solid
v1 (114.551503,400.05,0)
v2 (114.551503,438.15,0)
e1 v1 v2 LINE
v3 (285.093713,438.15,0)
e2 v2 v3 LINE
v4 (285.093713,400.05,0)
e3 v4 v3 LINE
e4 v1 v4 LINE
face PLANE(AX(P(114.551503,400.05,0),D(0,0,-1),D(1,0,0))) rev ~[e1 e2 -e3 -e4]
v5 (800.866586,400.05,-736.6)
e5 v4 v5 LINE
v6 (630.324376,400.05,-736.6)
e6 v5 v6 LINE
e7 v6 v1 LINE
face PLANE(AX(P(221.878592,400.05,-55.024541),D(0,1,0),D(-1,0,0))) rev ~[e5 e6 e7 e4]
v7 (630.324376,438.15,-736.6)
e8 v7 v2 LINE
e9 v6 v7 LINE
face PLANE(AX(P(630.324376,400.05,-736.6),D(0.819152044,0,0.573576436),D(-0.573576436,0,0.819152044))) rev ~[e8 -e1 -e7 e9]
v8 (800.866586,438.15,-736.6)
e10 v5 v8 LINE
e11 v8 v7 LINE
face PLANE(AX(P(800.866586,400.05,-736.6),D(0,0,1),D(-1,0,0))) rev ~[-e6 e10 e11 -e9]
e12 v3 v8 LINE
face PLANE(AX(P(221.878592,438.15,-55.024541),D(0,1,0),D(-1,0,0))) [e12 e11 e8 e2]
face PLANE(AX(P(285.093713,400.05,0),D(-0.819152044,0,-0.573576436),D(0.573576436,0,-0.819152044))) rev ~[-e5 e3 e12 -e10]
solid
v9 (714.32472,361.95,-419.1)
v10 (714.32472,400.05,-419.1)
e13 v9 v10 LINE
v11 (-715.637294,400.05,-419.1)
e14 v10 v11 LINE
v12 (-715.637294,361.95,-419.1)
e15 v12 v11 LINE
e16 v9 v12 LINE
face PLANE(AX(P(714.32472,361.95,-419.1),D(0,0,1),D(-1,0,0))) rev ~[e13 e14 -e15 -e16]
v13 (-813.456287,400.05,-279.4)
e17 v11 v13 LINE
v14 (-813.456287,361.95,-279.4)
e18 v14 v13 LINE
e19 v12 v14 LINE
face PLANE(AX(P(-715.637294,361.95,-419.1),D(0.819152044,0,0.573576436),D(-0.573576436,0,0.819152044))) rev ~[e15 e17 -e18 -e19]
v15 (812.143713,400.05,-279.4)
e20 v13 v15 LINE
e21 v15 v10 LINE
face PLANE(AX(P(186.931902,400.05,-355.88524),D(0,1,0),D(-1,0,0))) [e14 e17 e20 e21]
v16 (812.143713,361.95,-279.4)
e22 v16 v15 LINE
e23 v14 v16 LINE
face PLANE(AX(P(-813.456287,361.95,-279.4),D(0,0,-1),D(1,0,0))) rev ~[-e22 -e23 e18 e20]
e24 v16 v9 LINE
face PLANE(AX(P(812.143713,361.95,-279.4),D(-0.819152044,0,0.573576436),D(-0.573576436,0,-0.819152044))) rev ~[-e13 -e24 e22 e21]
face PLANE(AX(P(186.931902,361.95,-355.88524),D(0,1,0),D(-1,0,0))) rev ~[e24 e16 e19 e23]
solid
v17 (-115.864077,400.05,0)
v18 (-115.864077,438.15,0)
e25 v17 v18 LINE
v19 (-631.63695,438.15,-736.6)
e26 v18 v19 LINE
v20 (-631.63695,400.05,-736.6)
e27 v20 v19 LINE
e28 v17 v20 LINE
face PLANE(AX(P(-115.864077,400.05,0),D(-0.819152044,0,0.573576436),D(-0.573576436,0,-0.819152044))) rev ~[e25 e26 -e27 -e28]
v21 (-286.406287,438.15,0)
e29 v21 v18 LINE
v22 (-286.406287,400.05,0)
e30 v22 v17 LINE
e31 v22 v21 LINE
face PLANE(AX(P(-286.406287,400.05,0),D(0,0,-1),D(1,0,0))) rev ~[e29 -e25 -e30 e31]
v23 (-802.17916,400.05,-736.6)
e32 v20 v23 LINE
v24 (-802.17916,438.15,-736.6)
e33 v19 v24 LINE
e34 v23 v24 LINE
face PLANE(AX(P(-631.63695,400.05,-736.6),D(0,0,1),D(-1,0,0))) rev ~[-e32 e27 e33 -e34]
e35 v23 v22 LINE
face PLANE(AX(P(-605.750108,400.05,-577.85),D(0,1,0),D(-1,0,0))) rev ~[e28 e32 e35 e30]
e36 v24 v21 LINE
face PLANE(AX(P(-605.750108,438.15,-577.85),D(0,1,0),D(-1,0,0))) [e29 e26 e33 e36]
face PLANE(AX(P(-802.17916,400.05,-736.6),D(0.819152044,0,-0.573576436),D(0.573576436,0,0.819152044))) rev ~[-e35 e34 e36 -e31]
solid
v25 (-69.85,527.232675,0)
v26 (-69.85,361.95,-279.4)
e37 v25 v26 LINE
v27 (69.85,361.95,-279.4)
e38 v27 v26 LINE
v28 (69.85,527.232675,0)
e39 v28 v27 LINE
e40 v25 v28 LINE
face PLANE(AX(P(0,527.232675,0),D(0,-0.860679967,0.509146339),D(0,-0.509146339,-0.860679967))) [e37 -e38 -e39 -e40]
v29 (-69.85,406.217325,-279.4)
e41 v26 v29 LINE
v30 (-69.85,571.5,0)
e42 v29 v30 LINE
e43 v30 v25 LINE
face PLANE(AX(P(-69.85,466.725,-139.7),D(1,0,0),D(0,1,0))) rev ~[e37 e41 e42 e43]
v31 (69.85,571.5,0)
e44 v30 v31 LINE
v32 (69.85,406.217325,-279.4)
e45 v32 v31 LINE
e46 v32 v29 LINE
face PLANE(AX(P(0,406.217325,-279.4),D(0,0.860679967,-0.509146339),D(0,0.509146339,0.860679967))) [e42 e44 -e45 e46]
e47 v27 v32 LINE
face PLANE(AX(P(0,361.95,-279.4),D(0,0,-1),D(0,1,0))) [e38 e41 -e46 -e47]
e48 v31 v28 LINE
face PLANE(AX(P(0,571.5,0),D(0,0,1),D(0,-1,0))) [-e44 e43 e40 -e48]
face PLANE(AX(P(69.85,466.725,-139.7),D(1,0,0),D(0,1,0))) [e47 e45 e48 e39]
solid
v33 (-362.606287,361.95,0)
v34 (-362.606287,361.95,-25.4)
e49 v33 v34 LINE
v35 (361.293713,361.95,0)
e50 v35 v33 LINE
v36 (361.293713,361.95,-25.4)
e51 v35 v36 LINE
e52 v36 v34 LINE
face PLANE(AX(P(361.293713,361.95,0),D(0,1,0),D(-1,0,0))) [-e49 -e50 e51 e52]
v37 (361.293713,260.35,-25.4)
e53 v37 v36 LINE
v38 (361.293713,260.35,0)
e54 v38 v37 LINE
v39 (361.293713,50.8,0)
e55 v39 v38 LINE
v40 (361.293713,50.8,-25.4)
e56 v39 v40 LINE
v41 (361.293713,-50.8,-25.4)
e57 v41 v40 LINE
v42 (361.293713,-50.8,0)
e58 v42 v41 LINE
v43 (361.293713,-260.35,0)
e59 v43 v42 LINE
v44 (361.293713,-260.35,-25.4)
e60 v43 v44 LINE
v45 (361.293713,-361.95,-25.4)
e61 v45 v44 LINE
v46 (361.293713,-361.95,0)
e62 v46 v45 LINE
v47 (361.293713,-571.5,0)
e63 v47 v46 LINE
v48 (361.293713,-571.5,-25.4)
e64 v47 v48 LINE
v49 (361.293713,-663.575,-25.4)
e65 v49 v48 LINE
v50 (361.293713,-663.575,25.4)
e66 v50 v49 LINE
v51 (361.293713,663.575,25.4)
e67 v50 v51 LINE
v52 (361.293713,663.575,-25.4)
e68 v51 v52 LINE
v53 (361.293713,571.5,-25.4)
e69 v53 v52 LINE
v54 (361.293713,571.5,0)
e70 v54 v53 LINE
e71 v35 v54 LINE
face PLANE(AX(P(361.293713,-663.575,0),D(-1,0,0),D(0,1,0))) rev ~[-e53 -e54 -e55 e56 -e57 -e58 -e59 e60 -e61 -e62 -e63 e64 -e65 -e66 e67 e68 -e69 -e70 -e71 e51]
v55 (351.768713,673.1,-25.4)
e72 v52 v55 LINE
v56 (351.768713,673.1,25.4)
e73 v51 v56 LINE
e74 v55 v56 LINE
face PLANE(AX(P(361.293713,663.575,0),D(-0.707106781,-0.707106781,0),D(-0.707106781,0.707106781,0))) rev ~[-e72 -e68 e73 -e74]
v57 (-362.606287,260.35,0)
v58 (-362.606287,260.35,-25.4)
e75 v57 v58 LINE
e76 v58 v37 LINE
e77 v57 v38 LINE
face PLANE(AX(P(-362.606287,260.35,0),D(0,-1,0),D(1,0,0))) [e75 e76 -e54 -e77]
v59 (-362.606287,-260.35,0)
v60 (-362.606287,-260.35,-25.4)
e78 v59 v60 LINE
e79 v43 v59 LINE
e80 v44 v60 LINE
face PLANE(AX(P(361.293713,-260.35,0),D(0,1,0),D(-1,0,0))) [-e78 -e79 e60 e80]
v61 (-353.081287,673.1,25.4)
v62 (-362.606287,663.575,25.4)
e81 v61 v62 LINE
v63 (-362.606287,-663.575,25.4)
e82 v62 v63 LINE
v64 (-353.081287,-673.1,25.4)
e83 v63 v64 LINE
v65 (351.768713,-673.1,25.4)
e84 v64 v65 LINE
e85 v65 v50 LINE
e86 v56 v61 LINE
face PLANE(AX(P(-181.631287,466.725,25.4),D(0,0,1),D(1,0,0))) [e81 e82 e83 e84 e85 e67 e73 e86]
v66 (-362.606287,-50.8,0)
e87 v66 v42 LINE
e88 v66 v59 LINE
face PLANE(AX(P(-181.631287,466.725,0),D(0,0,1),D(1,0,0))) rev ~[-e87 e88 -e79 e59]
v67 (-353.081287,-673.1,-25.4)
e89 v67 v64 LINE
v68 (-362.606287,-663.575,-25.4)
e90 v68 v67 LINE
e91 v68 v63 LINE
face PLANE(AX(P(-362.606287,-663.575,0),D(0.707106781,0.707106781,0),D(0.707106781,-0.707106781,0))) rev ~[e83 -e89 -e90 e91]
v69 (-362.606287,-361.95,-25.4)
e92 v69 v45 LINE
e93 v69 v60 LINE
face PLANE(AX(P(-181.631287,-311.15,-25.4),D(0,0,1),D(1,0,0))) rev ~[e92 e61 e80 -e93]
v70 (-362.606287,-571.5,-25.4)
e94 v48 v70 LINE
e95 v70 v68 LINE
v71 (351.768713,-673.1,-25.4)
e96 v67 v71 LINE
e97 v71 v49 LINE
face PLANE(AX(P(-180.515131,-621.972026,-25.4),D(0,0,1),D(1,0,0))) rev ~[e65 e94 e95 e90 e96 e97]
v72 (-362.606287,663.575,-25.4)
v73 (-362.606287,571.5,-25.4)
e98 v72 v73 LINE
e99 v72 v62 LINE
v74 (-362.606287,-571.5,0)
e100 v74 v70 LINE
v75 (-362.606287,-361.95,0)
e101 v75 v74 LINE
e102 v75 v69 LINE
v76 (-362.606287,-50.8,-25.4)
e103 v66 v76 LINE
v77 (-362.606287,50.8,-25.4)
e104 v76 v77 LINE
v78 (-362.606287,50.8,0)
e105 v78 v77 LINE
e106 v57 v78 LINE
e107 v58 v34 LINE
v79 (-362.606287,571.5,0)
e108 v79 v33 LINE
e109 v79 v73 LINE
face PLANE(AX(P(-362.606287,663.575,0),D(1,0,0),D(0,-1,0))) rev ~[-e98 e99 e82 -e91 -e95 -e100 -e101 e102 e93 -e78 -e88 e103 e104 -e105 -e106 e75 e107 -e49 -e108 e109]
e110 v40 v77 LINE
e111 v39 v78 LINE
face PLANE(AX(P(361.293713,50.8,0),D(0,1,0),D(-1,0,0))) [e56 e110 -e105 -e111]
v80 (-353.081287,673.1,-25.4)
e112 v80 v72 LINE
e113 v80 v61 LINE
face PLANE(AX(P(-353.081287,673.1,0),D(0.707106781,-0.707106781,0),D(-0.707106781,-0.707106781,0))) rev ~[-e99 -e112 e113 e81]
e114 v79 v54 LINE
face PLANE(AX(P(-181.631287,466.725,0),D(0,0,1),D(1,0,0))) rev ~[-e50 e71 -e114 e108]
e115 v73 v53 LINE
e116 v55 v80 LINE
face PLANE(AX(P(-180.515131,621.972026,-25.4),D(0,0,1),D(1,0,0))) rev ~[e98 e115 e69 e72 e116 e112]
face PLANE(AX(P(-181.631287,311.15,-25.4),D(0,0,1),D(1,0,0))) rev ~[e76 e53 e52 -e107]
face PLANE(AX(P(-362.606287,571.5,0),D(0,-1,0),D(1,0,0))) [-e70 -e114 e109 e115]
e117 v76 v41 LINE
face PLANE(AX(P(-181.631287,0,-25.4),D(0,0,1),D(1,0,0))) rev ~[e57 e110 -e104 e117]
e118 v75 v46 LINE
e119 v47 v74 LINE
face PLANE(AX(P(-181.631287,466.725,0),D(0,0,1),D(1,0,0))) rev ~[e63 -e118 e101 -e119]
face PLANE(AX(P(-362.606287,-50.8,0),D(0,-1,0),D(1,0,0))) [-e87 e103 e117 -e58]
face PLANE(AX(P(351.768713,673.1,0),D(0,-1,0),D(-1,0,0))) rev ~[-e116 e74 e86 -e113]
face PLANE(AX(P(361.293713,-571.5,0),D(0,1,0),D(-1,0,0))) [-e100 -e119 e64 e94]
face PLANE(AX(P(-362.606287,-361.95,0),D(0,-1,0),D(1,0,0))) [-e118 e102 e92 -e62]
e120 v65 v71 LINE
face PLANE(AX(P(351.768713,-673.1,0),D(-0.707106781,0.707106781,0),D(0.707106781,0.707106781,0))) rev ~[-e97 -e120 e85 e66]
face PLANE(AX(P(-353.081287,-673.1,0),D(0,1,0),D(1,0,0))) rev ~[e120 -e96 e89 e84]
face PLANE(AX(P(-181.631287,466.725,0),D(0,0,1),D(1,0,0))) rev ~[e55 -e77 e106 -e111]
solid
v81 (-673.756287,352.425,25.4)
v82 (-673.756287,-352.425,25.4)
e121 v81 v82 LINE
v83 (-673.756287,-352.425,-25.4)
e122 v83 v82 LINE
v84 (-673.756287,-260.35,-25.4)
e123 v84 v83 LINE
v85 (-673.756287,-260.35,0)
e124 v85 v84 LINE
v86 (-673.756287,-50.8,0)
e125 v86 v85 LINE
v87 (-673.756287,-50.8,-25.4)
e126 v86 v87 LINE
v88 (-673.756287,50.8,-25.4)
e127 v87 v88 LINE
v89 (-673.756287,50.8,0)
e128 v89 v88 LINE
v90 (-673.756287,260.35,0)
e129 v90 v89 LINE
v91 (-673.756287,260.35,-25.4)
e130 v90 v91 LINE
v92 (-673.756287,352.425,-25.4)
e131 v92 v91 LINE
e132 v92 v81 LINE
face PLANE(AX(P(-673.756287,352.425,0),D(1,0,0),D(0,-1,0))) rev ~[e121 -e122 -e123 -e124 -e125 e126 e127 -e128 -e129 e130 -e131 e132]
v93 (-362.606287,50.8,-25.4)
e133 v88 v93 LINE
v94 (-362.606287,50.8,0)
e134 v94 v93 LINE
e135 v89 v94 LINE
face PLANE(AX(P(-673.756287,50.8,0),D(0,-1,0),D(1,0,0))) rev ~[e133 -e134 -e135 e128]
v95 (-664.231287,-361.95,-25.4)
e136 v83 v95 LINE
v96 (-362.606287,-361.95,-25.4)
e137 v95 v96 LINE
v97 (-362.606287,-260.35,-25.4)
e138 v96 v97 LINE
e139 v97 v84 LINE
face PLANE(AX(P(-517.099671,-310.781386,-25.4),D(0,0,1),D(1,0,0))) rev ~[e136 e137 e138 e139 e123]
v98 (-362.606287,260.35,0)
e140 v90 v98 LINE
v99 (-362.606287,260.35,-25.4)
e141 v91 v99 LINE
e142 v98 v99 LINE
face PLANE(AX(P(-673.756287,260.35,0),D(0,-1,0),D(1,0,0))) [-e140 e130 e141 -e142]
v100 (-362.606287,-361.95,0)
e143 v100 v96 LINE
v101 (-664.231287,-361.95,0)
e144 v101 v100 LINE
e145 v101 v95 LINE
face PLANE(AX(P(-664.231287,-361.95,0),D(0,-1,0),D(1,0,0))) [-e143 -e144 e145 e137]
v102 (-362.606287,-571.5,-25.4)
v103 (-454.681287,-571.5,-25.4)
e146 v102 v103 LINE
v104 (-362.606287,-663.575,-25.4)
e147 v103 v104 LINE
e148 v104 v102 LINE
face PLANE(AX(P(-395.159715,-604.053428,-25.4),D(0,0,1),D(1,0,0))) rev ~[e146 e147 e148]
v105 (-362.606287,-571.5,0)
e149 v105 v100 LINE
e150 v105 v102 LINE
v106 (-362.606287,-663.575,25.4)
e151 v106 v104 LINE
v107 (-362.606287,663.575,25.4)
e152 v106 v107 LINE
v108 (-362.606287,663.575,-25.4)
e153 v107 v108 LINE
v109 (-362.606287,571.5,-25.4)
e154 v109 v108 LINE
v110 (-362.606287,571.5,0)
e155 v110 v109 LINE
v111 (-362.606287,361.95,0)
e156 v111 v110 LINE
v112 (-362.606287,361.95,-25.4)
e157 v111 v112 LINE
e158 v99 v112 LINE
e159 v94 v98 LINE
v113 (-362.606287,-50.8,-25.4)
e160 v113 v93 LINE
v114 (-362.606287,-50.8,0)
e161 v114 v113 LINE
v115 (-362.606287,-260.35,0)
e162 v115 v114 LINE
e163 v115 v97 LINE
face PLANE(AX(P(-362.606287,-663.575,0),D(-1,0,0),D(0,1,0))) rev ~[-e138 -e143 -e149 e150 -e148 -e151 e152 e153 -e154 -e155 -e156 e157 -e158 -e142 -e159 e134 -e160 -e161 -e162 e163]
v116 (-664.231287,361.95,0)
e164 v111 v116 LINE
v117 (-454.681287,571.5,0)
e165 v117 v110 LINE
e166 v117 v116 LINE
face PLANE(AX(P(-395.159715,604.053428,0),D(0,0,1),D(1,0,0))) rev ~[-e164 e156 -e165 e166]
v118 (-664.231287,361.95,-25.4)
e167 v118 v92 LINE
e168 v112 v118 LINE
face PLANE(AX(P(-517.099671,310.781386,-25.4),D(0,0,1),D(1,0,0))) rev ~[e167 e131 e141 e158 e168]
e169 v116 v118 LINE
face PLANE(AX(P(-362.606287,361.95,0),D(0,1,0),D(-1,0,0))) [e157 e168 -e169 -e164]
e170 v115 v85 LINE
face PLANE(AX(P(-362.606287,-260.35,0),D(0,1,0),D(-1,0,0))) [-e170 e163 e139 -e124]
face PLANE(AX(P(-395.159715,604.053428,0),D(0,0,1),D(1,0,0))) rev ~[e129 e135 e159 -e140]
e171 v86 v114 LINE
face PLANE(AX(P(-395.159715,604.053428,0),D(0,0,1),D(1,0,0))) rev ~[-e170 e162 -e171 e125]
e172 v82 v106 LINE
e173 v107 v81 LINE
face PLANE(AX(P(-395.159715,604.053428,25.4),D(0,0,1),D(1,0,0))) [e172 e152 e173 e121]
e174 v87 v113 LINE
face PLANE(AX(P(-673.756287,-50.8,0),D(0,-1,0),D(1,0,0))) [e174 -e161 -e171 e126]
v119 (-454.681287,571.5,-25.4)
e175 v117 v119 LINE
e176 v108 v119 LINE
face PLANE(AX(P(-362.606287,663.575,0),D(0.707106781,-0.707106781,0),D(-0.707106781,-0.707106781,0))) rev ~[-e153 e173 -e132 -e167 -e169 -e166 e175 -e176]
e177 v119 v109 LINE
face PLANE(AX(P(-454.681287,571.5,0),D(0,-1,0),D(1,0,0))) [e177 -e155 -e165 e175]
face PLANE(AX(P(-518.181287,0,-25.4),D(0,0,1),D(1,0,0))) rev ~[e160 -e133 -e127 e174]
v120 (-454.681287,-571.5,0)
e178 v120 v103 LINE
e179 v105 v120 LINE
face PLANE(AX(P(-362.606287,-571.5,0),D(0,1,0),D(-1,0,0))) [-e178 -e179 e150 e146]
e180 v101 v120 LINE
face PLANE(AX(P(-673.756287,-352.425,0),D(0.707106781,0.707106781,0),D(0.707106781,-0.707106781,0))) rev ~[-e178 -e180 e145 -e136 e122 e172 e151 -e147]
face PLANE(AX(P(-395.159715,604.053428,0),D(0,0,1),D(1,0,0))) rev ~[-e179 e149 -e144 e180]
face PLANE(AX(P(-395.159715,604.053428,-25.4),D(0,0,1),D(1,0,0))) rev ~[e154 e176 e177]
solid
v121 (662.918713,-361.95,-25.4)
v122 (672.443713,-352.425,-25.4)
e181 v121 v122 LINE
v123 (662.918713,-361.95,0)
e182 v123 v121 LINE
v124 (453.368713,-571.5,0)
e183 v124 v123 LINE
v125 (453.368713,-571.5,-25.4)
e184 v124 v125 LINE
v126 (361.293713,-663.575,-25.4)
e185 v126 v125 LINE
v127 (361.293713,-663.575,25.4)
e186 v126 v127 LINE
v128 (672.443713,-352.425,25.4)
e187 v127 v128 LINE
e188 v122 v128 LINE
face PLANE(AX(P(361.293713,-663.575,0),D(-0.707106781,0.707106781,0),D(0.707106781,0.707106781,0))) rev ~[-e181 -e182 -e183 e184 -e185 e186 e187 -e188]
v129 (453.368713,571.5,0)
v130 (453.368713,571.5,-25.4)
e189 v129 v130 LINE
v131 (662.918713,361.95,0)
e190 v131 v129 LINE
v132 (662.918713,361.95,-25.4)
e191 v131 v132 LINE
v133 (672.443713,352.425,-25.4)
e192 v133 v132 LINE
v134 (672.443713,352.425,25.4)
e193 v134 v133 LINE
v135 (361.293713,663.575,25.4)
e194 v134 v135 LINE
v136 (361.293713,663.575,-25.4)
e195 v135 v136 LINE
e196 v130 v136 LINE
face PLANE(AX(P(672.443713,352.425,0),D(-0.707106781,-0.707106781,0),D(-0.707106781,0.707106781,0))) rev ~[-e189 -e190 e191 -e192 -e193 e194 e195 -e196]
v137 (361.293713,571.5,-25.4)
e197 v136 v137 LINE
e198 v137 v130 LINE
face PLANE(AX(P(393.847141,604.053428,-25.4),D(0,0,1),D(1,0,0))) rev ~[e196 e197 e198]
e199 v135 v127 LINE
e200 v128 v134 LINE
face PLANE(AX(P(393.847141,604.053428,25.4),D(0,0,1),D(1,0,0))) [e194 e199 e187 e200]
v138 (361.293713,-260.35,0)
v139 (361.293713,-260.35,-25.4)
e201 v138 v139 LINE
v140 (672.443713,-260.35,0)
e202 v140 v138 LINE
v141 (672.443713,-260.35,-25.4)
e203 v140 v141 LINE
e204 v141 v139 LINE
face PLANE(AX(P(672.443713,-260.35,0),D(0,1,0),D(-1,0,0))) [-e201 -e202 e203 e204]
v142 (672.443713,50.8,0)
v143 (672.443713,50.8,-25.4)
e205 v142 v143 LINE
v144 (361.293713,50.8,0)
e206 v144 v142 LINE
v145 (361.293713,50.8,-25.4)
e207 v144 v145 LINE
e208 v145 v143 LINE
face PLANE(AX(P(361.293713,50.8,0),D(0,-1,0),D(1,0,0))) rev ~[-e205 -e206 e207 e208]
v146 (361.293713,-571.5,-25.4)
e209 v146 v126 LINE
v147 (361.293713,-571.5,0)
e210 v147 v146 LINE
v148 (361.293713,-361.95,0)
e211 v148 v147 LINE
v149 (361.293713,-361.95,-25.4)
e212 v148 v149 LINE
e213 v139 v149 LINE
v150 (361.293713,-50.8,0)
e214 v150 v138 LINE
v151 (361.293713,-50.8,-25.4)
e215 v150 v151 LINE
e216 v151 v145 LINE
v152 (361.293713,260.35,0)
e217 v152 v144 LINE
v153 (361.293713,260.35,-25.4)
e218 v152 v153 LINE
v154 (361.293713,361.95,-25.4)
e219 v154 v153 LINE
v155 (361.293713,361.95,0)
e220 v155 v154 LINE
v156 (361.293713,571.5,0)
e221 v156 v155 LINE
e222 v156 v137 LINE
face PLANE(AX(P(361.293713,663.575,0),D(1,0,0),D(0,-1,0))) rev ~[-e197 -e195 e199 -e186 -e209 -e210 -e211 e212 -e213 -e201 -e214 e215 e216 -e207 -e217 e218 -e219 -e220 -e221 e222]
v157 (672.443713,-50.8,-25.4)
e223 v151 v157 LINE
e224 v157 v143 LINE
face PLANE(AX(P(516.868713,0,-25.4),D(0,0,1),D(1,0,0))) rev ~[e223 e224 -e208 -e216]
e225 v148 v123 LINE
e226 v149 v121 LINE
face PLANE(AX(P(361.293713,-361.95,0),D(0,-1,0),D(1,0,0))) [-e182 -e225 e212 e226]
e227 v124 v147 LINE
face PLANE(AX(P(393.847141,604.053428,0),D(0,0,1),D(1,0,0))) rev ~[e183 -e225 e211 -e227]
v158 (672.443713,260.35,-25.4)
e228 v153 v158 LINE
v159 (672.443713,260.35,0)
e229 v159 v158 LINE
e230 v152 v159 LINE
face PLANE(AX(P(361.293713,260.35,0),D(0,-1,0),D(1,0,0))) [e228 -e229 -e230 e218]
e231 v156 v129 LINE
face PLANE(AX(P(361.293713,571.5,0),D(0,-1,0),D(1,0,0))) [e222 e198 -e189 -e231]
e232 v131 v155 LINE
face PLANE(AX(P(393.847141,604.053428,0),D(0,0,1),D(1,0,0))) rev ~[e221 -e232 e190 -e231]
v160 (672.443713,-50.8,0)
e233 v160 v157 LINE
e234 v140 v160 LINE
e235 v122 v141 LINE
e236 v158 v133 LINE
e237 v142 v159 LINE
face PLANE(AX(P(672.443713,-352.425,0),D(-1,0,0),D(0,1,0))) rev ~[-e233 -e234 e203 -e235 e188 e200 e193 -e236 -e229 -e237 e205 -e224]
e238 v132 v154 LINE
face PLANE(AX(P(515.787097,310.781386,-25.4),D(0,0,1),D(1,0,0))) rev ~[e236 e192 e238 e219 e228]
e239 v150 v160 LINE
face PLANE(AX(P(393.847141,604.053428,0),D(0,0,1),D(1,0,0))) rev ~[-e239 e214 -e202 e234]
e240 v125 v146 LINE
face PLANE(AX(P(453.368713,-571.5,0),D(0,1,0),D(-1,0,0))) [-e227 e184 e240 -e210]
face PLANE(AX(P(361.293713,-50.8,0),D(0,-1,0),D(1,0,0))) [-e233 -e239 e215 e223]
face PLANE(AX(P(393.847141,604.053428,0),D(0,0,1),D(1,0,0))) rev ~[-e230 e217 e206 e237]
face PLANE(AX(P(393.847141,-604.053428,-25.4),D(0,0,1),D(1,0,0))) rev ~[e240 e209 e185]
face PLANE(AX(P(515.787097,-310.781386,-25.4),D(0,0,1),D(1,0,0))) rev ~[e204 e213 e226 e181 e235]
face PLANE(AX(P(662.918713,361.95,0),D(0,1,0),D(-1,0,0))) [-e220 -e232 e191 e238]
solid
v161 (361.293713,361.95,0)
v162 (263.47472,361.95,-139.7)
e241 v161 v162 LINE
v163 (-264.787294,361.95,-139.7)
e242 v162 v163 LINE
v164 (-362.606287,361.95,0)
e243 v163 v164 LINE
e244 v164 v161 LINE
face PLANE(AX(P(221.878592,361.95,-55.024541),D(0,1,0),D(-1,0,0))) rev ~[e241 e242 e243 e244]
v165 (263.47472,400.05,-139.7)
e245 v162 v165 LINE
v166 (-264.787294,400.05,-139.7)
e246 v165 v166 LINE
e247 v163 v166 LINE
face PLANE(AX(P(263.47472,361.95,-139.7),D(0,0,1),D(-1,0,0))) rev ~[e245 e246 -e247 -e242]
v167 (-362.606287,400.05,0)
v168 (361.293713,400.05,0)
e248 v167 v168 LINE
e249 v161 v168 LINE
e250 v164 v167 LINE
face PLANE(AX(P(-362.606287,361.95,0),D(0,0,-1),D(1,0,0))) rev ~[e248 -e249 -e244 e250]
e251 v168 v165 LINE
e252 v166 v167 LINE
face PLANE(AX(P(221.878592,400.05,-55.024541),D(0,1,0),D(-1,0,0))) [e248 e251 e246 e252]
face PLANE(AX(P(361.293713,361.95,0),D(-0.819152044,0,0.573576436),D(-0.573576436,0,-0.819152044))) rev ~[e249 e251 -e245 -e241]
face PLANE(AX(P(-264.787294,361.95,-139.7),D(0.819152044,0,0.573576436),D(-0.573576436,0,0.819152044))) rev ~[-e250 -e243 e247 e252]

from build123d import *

# Parameters (mm, degrees)
F1_DEPTH  = 25.4
F0_W      = 311.15
F0_H      = 101.6
F0_H_2    = 209.55
F2_DEPTH  = 25.4
F3_DEPTH  = 25.4
F4_DEPTH  = 25.4
F5_DEPTH  = 25.4
F0_W_2    = 361.95
F6_DEPTH  = 25.4
F9_START  = 38.1
F9_DEPTH  = 38.1
F10_DEPTH = 38.1
F12_DEPTH = 69.85


with BuildPart() as f1:
    # F0 (on Top) → F1 (new body)
    with BuildSketch(Plane.XY):
        Polygon((-362.6062870026, 571.5), (-362.6062870026, 663.575), (-454.6812870026, 571.5), align=None)
    extrude(amount=-F1_DEPTH)



with BuildPart() as f1b:
    # F0 (on Top) → F1, piece 2 (new body)
    with BuildSketch(Plane.XY):
        Polygon((-362.6062870026, 260.35), (-362.6062870026, 361.95), (-664.2312870026, 361.95), (-673.7562870026, 352.425), (-673.7562870026, 260.35), align=None)
    extrude(amount=-F1_DEPTH)


with BuildPart() as f1c:
    # F0 (on Top) → F1, piece 3 (new body)
    with BuildSketch(Plane.XY):
        with Locations((-518.1812870026, 0)):
            Rectangle(F0_W, F0_H)
    extrude(amount=-F1_DEPTH)


with BuildPart() as f1d:
    # F0 (on Top) → F1, piece 4 (new body)
    with BuildSketch(Plane.XY):
        Polygon((-362.6062870026, -361.95), (-362.6062870026, -260.35), (-673.7562870026, -260.35), (-673.7562870026, -352.425), (-664.2312870026, -361.95), align=None)
    extrude(amount=-F1_DEPTH)


with BuildPart() as f1e:
    # F0 (on Top) → F1, piece 5 (new body)
    with BuildSketch(Plane.XY):
        Polygon((-362.6062870026, -663.575), (-362.6062870026, -571.5), (-454.6812870026, -571.5), align=None)
    extrude(amount=-F1_DEPTH)


with BuildPart() as f1_1:
    add(f1.part)

    add(f1b.part)  # F2 merges F1b

    add(f1c.part)  # F2 merges F1c

    add(f1d.part)  # F2 merges F1d

    add(f1e.part)  # F2 merges F1e
    # F0 (on Top) → F2 (join)
    with BuildSketch(Plane.XY):
        Polygon((-362.6062870026, 571.5), (-362.6062870026, 663.575), (-454.6812870026, 571.5), align=None)
        Polygon((-362.6062870026, 361.95), (-362.6062870026, 571.5), (-454.6812870026, 571.5), (-664.2312870026, 361.95), align=None)
        Polygon((-362.6062870026, 260.35), (-362.6062870026, 361.95), (-664.2312870026, 361.95), (-673.7562870026, 352.425), (-673.7562870026, 260.35), align=None)
        with Locations((-518.1812870026, 155.575)):
            Rectangle(F0_W, F0_H_2)
        with Locations((-518.1812870026, 0)):
            Rectangle(F0_W, F0_H)
        with Locations((-518.1812870026, -155.575)):
            Rectangle(F0_W, F0_H_2)
        Polygon((-362.6062870026, -361.95), (-362.6062870026, -260.35), (-673.7562870026, -260.35), (-673.7562870026, -352.425), (-664.2312870026, -361.95), align=None)
        Polygon((-362.6062870026, -571.5), (-362.6062870026, -361.95), (-664.2312870026, -361.95), (-454.6812870026, -571.5), align=None)
        Polygon((-362.6062870026, -663.575), (-362.6062870026, -571.5), (-454.6812870026, -571.5), align=None)
    extrude(amount=F2_DEPTH)


with BuildPart() as f3:
    # F0 (on Top) → F3 (new body)
    with BuildSketch(Plane.XY):
        Polygon((361.2937129974, 663.575), (361.2937129974, 571.5), (453.3687129974, 571.5), align=None)
    extrude(amount=-F3_DEPTH)



with BuildPart() as f3b:
    # F0 (on Top) → F3, piece 2 (new body)
    with BuildSketch(Plane.XY):
        Polygon((662.9187129974, 361.95), (361.2937129974, 361.95), (361.2937129974, 260.35), (672.4437129974, 260.35), (672.4437129974, 352.425), align=None)
    extrude(amount=-F3_DEPTH)


with BuildPart() as f3c:
    # F0 (on Top) → F3, piece 3 (new body)
    with BuildSketch(Plane.XY):
        with Locations((516.8687129974, 0)):
            Rectangle(F0_W, F0_H)
    extrude(amount=-F3_DEPTH)


with BuildPart() as f3d:
    # F0 (on Top) → F3, piece 4 (new body)
    with BuildSketch(Plane.XY):
        Polygon((672.4437129974, -260.35), (361.2937129974, -260.35), (361.2937129974, -361.95), (662.9187129974, -361.95), (672.4437129974, -352.425), align=None)
    extrude(amount=-F3_DEPTH)


with BuildPart() as f3e:
    # F0 (on Top) → F3, piece 5 (new body)
    with BuildSketch(Plane.XY):
        Polygon((453.3687129974, -571.5), (361.2937129974, -571.5), (361.2937129974, -663.575), align=None)
    extrude(amount=-F3_DEPTH)


with BuildPart() as f3_1:
    add(f3.part)

    add(f3b.part)  # F4 merges F3b

    add(f3c.part)  # F4 merges F3c

    add(f3d.part)  # F4 merges F3d

    add(f3e.part)  # F4 merges F3e
    # F0 (on Top) → F4 (join)
    with BuildSketch(Plane.XY):
        Polygon((361.2937129974, 663.575), (361.2937129974, 571.5), (453.3687129974, 571.5), align=None)
        Polygon((453.3687129974, 571.5), (361.2937129974, 571.5), (361.2937129974, 361.95), (662.9187129974, 361.95), align=None)
        Polygon((662.9187129974, 361.95), (361.2937129974, 361.95), (361.2937129974, 260.35), (672.4437129974, 260.35), (672.4437129974, 352.425), align=None)
        with Locations((516.8687129974, 155.575)):
            Rectangle(F0_W, F0_H_2)
        with Locations((516.8687129974, 0)):
            Rectangle(F0_W, F0_H)
        with Locations((516.8687129974, -155.575)):
            Rectangle(F0_W, F0_H_2)
        Polygon((672.4437129974, -260.35), (361.2937129974, -260.35), (361.2937129974, -361.95), (662.9187129974, -361.95), (672.4437129974, -352.425), align=None)
        Polygon((662.9187129974, -361.95), (361.2937129974, -361.95), (361.2937129974, -571.5), (453.3687129974, -571.5), align=None)
        Polygon((453.3687129974, -571.5), (361.2937129974, -571.5), (361.2937129974, -663.575), align=None)
    extrude(amount=F4_DEPTH)


with BuildPart() as f5:
    # F0 (on Top) → F5 (new body)
    with BuildSketch(Plane.XY):
        Polygon((-353.0812870026, 673.1), (-362.6062870026, 663.575), (-362.6062870026, 571.5), (-0.6562870026, 571.5), (-0.6562870026, 673.1), align=None)
        Polygon((-0.6562870026, 673.1), (-0.6562870026, 571.5), (361.2937129974, 571.5), (361.2937129974, 663.575), (351.7687129974, 673.1), align=None)
    extrude(amount=-F5_DEPTH)



with BuildPart() as f5b:
    # F0 (on Top) → F5, piece 2 (new body)
    with BuildSketch(Plane.XY):
        with Locations((-181.6312870026, 311.15)):
            Rectangle(F0_W_2, F0_H)
        with Locations((180.3187129974, 311.15)):
            Rectangle(F0_W_2, F0_H)
    extrude(amount=-F5_DEPTH)


with BuildPart() as f5c:
    # F0 (on Top) → F5, piece 3 (new body)
    with BuildSketch(Plane.XY):
        with Locations((-181.6312870026, 0)):
            Rectangle(F0_W_2, F0_H)
        with Locations((180.3187129974, 0)):
            Rectangle(F0_W_2, F0_H)
    extrude(amount=-F5_DEPTH)


with BuildPart() as f5d:
    # F0 (on Top) → F5, piece 4 (new body)
    with BuildSketch(Plane.XY):
        with Locations((-181.6312870026, -311.15)):
            Rectangle(F0_W_2, F0_H)
        with Locations((180.3187129974, -311.15)):
            Rectangle(F0_W_2, F0_H)
    extrude(amount=-F5_DEPTH)


with BuildPart() as f5e:
    # F0 (on Top) → F5, piece 5 (new body)
    with BuildSketch(Plane.XY):
        Polygon((-0.6562870026, -571.5), (-362.6062870026, -571.5), (-362.6062870026, -663.575), (-353.0812870026, -673.1), (-0.6562870026, -673.1), align=None)
        Polygon((361.2937129974, -571.5), (-0.6562870026, -571.5), (-0.6562870026, -673.1), (351.7687129974, -673.1), (361.2937129974, -663.575), align=None)
    extrude(amount=-F5_DEPTH)


with BuildPart() as f5_1:
    add(f5.part)

    add(f5b.part)  # F6 merges F5b

    add(f5c.part)  # F6 merges F5c

    add(f5d.part)  # F6 merges F5d

    add(f5e.part)  # F6 merges F5e
    # F0 (on Top) → F6 (join)
    with BuildSketch(Plane.XY):
        with Locations((-181.6312870026, 466.725)):
            Rectangle(F0_W_2, F0_H_2)
        with Locations((180.3187129974, 466.725)):
            Rectangle(F0_W_2, F0_H_2)
        Polygon((-353.0812870026, 673.1), (-362.6062870026, 663.575), (-362.6062870026, 571.5), (-0.6562870026, 571.5), (-0.6562870026, 673.1), align=None)
        Polygon((-0.6562870026, 673.1), (-0.6562870026, 571.5), (361.2937129974, 571.5), (361.2937129974, 663.575), (351.7687129974, 673.1), align=None)
        with Locations((-181.6312870026, 311.15)):
            Rectangle(F0_W_2, F0_H)
        with Locations((180.3187129974, 311.15)):
            Rectangle(F0_W_2, F0_H)
        with Locations((-181.6312870026, 155.575)):
            Rectangle(F0_W_2, F0_H_2)
        with Locations((180.3187129974, 155.575)):
            Rectangle(F0_W_2, F0_H_2)
        with Locations((180.3187129974, 0)):
            Rectangle(F0_W_2, F0_H)
        with Locations((-181.6312870026, 0)):
            Rectangle(F0_W_2, F0_H)
        with Locations((-181.6312870026, -155.575)):
            Rectangle(F0_W_2, F0_H_2)
        with Locations((180.3187129974, -155.575)):
            Rectangle(F0_W_2, F0_H_2)
        with Locations((180.3187129974, -311.15)):
            Rectangle(F0_W_2, F0_H)
        with Locations((-181.6312870026, -311.15)):
            Rectangle(F0_W_2, F0_H)
        with Locations((-181.6312870026, -466.725)):
            Rectangle(F0_W_2, F0_H_2)
        with Locations((180.3187129974, -466.725)):
            Rectangle(F0_W_2, F0_H_2)
        Polygon((361.2937129974, -571.5), (-0.6562870026, -571.5), (-0.6562870026, -673.1), (351.7687129974, -673.1), (361.2937129974, -663.575), align=None)
        Polygon((-0.6562870026, -571.5), (-362.6062870026, -571.5), (-362.6062870026, -663.575), (-353.0812870026, -673.1), (-0.6562870026, -673.1), align=None)
    extrude(amount=F6_DEPTH)


with BuildPart() as f9:
    # F8 (on line) → F9 (new body)
    with BuildSketch(Plane(origin=(0, 361.95, 0), x_dir=(-1, 0, 0), z_dir=(0, 1, 0)).offset(F9_START)):
        Polygon((-212.3704960354, -139.7), (-114.5515029475, 0), (-285.0937129974, 0), (-323.1937129974, -54.4124390569), (-263.4747199095, -139.7), align=None)
        Polygon((-310.1894891233, -279.4), (-212.3704960354, -139.7), (-263.4747199095, -139.7), (-323.1937129974, -54.4124390569), (-480.7316991732, -279.4), align=None)
        Polygon((-408.0084822112, -419.1), (-310.1894891233, -279.4), (-480.7316991732, -279.4), (-578.5506922611, -419.1), align=None)
        Polygon((-630.3243755927, -736.6), (-408.0084822112, -419.1), (-578.5506922611, -419.1), (-800.8665856427, -736.6), align=None)
    extrude(amount=F9_DEPTH)


with BuildPart() as f9b:
    # F8 (on line) → F9, piece 2 (new body)
    with BuildSketch(Plane(origin=(0, 361.95, 0), x_dir=(-1, 0, 0), z_dir=(0, 1, 0)).offset(F9_START)):
        Polygon((579.8632662663, -419.1), (409.3210562163, -419.1), (631.6369495979, -736.6), (802.1791596478, -736.6), align=None)
        Polygon((482.0442731784, -279.4), (311.5020631284, -279.4), (409.3210562163, -419.1), (579.8632662663, -419.1), align=None)
        Polygon((264.7872939147, -139.7), (213.6830700405, -139.7), (311.5020631284, -279.4), (482.0442731784, -279.4), (324.5062870026, -54.4124390569), align=None)
        Polygon((286.4062870026, 0), (115.8640769526, 0), (213.6830700405, -139.7), (264.7872939147, -139.7), (324.5062870026, -54.4124390569), align=None)
    extrude(amount=F9_DEPTH)


with BuildPart() as f10:
    # F8 (on line) → F10 (new body)
    with BuildSketch(Plane(origin=(0, 361.95, 0), x_dir=(-1, 0, 0), z_dir=(0, 1, 0))):
        Polygon((-212.3704960354, -139.7), (-114.5515029475, 0), (-285.0937129974, 0), (-323.1937129974, -54.4124390569), (-263.4747199095, -139.7), align=None)
        Polygon((0.6562870026, -139.7), (0.6562870026, 0), (-114.5515029475, 0), (-212.3704960354, -139.7), align=None)
        Polygon((115.8640769526, 0), (0.6562870026, 0), (0.6562870026, -139.7), (213.6830700405, -139.7), align=None)
        Polygon((286.4062870026, 0), (115.8640769526, 0), (213.6830700405, -139.7), (264.7872939147, -139.7), (324.5062870026, -54.4124390569), align=None)
        Polygon((-323.1937129974, -54.4124390569), (-285.0937129974, 0), (-361.2937129974, 0), align=None)
        Polygon((362.6062870026, 0), (286.4062870026, 0), (324.5062870026, -54.4124390569), align=None)
    extrude(amount=F10_DEPTH)


with BuildPart() as f10b:
    # F8 (on line) → F10, piece 2 (new body)
    with BuildSketch(Plane(origin=(0, 361.95, 0), x_dir=(-1, 0, 0), z_dir=(0, 1, 0))):
        Polygon((0.6562870026, -279.4), (-310.1894891233, -279.4), (-408.0084822112, -419.1), (0.6562870026, -419.1), align=None)
        Polygon((409.3210562163, -419.1), (311.5020631284, -279.4), (0.6562870026, -279.4), (0.6562870026, -419.1), align=None)
        Polygon((482.0442731784, -279.4), (311.5020631284, -279.4), (409.3210562163, -419.1), (579.8632662663, -419.1), align=None)
        Polygon((813.4562870026, -279.4), (482.0442731784, -279.4), (579.8632662663, -419.1), (715.6372939147, -419.1), align=None)
        Polygon((-408.0084822112, -419.1), (-310.1894891233, -279.4), (-480.7316991732, -279.4), (-578.5506922611, -419.1), align=None)
        Polygon((-578.5506922611, -419.1), (-480.7316991732, -279.4), (-812.1437129974, -279.4), (-714.3247199095, -419.1), align=None)
    extrude(amount=F10_DEPTH)


with BuildPart() as f12:
    # F11 (on Right) → F12 (new body, symmetric)
    with BuildSketch(Plane.YZ):
        Polygon((406.2173252089, -279.4), (571.5, 0), (546.7129550388, 0), (527.2326747911, 0), (361.95, -279.4), align=None)
    extrude(amount=F12_DEPTH, both=True)


solid = Compound([f1_1.part, f3_1.part, f5_1.part, f9.part, f9b.part, f10.part, f10b.part, f12.part])
